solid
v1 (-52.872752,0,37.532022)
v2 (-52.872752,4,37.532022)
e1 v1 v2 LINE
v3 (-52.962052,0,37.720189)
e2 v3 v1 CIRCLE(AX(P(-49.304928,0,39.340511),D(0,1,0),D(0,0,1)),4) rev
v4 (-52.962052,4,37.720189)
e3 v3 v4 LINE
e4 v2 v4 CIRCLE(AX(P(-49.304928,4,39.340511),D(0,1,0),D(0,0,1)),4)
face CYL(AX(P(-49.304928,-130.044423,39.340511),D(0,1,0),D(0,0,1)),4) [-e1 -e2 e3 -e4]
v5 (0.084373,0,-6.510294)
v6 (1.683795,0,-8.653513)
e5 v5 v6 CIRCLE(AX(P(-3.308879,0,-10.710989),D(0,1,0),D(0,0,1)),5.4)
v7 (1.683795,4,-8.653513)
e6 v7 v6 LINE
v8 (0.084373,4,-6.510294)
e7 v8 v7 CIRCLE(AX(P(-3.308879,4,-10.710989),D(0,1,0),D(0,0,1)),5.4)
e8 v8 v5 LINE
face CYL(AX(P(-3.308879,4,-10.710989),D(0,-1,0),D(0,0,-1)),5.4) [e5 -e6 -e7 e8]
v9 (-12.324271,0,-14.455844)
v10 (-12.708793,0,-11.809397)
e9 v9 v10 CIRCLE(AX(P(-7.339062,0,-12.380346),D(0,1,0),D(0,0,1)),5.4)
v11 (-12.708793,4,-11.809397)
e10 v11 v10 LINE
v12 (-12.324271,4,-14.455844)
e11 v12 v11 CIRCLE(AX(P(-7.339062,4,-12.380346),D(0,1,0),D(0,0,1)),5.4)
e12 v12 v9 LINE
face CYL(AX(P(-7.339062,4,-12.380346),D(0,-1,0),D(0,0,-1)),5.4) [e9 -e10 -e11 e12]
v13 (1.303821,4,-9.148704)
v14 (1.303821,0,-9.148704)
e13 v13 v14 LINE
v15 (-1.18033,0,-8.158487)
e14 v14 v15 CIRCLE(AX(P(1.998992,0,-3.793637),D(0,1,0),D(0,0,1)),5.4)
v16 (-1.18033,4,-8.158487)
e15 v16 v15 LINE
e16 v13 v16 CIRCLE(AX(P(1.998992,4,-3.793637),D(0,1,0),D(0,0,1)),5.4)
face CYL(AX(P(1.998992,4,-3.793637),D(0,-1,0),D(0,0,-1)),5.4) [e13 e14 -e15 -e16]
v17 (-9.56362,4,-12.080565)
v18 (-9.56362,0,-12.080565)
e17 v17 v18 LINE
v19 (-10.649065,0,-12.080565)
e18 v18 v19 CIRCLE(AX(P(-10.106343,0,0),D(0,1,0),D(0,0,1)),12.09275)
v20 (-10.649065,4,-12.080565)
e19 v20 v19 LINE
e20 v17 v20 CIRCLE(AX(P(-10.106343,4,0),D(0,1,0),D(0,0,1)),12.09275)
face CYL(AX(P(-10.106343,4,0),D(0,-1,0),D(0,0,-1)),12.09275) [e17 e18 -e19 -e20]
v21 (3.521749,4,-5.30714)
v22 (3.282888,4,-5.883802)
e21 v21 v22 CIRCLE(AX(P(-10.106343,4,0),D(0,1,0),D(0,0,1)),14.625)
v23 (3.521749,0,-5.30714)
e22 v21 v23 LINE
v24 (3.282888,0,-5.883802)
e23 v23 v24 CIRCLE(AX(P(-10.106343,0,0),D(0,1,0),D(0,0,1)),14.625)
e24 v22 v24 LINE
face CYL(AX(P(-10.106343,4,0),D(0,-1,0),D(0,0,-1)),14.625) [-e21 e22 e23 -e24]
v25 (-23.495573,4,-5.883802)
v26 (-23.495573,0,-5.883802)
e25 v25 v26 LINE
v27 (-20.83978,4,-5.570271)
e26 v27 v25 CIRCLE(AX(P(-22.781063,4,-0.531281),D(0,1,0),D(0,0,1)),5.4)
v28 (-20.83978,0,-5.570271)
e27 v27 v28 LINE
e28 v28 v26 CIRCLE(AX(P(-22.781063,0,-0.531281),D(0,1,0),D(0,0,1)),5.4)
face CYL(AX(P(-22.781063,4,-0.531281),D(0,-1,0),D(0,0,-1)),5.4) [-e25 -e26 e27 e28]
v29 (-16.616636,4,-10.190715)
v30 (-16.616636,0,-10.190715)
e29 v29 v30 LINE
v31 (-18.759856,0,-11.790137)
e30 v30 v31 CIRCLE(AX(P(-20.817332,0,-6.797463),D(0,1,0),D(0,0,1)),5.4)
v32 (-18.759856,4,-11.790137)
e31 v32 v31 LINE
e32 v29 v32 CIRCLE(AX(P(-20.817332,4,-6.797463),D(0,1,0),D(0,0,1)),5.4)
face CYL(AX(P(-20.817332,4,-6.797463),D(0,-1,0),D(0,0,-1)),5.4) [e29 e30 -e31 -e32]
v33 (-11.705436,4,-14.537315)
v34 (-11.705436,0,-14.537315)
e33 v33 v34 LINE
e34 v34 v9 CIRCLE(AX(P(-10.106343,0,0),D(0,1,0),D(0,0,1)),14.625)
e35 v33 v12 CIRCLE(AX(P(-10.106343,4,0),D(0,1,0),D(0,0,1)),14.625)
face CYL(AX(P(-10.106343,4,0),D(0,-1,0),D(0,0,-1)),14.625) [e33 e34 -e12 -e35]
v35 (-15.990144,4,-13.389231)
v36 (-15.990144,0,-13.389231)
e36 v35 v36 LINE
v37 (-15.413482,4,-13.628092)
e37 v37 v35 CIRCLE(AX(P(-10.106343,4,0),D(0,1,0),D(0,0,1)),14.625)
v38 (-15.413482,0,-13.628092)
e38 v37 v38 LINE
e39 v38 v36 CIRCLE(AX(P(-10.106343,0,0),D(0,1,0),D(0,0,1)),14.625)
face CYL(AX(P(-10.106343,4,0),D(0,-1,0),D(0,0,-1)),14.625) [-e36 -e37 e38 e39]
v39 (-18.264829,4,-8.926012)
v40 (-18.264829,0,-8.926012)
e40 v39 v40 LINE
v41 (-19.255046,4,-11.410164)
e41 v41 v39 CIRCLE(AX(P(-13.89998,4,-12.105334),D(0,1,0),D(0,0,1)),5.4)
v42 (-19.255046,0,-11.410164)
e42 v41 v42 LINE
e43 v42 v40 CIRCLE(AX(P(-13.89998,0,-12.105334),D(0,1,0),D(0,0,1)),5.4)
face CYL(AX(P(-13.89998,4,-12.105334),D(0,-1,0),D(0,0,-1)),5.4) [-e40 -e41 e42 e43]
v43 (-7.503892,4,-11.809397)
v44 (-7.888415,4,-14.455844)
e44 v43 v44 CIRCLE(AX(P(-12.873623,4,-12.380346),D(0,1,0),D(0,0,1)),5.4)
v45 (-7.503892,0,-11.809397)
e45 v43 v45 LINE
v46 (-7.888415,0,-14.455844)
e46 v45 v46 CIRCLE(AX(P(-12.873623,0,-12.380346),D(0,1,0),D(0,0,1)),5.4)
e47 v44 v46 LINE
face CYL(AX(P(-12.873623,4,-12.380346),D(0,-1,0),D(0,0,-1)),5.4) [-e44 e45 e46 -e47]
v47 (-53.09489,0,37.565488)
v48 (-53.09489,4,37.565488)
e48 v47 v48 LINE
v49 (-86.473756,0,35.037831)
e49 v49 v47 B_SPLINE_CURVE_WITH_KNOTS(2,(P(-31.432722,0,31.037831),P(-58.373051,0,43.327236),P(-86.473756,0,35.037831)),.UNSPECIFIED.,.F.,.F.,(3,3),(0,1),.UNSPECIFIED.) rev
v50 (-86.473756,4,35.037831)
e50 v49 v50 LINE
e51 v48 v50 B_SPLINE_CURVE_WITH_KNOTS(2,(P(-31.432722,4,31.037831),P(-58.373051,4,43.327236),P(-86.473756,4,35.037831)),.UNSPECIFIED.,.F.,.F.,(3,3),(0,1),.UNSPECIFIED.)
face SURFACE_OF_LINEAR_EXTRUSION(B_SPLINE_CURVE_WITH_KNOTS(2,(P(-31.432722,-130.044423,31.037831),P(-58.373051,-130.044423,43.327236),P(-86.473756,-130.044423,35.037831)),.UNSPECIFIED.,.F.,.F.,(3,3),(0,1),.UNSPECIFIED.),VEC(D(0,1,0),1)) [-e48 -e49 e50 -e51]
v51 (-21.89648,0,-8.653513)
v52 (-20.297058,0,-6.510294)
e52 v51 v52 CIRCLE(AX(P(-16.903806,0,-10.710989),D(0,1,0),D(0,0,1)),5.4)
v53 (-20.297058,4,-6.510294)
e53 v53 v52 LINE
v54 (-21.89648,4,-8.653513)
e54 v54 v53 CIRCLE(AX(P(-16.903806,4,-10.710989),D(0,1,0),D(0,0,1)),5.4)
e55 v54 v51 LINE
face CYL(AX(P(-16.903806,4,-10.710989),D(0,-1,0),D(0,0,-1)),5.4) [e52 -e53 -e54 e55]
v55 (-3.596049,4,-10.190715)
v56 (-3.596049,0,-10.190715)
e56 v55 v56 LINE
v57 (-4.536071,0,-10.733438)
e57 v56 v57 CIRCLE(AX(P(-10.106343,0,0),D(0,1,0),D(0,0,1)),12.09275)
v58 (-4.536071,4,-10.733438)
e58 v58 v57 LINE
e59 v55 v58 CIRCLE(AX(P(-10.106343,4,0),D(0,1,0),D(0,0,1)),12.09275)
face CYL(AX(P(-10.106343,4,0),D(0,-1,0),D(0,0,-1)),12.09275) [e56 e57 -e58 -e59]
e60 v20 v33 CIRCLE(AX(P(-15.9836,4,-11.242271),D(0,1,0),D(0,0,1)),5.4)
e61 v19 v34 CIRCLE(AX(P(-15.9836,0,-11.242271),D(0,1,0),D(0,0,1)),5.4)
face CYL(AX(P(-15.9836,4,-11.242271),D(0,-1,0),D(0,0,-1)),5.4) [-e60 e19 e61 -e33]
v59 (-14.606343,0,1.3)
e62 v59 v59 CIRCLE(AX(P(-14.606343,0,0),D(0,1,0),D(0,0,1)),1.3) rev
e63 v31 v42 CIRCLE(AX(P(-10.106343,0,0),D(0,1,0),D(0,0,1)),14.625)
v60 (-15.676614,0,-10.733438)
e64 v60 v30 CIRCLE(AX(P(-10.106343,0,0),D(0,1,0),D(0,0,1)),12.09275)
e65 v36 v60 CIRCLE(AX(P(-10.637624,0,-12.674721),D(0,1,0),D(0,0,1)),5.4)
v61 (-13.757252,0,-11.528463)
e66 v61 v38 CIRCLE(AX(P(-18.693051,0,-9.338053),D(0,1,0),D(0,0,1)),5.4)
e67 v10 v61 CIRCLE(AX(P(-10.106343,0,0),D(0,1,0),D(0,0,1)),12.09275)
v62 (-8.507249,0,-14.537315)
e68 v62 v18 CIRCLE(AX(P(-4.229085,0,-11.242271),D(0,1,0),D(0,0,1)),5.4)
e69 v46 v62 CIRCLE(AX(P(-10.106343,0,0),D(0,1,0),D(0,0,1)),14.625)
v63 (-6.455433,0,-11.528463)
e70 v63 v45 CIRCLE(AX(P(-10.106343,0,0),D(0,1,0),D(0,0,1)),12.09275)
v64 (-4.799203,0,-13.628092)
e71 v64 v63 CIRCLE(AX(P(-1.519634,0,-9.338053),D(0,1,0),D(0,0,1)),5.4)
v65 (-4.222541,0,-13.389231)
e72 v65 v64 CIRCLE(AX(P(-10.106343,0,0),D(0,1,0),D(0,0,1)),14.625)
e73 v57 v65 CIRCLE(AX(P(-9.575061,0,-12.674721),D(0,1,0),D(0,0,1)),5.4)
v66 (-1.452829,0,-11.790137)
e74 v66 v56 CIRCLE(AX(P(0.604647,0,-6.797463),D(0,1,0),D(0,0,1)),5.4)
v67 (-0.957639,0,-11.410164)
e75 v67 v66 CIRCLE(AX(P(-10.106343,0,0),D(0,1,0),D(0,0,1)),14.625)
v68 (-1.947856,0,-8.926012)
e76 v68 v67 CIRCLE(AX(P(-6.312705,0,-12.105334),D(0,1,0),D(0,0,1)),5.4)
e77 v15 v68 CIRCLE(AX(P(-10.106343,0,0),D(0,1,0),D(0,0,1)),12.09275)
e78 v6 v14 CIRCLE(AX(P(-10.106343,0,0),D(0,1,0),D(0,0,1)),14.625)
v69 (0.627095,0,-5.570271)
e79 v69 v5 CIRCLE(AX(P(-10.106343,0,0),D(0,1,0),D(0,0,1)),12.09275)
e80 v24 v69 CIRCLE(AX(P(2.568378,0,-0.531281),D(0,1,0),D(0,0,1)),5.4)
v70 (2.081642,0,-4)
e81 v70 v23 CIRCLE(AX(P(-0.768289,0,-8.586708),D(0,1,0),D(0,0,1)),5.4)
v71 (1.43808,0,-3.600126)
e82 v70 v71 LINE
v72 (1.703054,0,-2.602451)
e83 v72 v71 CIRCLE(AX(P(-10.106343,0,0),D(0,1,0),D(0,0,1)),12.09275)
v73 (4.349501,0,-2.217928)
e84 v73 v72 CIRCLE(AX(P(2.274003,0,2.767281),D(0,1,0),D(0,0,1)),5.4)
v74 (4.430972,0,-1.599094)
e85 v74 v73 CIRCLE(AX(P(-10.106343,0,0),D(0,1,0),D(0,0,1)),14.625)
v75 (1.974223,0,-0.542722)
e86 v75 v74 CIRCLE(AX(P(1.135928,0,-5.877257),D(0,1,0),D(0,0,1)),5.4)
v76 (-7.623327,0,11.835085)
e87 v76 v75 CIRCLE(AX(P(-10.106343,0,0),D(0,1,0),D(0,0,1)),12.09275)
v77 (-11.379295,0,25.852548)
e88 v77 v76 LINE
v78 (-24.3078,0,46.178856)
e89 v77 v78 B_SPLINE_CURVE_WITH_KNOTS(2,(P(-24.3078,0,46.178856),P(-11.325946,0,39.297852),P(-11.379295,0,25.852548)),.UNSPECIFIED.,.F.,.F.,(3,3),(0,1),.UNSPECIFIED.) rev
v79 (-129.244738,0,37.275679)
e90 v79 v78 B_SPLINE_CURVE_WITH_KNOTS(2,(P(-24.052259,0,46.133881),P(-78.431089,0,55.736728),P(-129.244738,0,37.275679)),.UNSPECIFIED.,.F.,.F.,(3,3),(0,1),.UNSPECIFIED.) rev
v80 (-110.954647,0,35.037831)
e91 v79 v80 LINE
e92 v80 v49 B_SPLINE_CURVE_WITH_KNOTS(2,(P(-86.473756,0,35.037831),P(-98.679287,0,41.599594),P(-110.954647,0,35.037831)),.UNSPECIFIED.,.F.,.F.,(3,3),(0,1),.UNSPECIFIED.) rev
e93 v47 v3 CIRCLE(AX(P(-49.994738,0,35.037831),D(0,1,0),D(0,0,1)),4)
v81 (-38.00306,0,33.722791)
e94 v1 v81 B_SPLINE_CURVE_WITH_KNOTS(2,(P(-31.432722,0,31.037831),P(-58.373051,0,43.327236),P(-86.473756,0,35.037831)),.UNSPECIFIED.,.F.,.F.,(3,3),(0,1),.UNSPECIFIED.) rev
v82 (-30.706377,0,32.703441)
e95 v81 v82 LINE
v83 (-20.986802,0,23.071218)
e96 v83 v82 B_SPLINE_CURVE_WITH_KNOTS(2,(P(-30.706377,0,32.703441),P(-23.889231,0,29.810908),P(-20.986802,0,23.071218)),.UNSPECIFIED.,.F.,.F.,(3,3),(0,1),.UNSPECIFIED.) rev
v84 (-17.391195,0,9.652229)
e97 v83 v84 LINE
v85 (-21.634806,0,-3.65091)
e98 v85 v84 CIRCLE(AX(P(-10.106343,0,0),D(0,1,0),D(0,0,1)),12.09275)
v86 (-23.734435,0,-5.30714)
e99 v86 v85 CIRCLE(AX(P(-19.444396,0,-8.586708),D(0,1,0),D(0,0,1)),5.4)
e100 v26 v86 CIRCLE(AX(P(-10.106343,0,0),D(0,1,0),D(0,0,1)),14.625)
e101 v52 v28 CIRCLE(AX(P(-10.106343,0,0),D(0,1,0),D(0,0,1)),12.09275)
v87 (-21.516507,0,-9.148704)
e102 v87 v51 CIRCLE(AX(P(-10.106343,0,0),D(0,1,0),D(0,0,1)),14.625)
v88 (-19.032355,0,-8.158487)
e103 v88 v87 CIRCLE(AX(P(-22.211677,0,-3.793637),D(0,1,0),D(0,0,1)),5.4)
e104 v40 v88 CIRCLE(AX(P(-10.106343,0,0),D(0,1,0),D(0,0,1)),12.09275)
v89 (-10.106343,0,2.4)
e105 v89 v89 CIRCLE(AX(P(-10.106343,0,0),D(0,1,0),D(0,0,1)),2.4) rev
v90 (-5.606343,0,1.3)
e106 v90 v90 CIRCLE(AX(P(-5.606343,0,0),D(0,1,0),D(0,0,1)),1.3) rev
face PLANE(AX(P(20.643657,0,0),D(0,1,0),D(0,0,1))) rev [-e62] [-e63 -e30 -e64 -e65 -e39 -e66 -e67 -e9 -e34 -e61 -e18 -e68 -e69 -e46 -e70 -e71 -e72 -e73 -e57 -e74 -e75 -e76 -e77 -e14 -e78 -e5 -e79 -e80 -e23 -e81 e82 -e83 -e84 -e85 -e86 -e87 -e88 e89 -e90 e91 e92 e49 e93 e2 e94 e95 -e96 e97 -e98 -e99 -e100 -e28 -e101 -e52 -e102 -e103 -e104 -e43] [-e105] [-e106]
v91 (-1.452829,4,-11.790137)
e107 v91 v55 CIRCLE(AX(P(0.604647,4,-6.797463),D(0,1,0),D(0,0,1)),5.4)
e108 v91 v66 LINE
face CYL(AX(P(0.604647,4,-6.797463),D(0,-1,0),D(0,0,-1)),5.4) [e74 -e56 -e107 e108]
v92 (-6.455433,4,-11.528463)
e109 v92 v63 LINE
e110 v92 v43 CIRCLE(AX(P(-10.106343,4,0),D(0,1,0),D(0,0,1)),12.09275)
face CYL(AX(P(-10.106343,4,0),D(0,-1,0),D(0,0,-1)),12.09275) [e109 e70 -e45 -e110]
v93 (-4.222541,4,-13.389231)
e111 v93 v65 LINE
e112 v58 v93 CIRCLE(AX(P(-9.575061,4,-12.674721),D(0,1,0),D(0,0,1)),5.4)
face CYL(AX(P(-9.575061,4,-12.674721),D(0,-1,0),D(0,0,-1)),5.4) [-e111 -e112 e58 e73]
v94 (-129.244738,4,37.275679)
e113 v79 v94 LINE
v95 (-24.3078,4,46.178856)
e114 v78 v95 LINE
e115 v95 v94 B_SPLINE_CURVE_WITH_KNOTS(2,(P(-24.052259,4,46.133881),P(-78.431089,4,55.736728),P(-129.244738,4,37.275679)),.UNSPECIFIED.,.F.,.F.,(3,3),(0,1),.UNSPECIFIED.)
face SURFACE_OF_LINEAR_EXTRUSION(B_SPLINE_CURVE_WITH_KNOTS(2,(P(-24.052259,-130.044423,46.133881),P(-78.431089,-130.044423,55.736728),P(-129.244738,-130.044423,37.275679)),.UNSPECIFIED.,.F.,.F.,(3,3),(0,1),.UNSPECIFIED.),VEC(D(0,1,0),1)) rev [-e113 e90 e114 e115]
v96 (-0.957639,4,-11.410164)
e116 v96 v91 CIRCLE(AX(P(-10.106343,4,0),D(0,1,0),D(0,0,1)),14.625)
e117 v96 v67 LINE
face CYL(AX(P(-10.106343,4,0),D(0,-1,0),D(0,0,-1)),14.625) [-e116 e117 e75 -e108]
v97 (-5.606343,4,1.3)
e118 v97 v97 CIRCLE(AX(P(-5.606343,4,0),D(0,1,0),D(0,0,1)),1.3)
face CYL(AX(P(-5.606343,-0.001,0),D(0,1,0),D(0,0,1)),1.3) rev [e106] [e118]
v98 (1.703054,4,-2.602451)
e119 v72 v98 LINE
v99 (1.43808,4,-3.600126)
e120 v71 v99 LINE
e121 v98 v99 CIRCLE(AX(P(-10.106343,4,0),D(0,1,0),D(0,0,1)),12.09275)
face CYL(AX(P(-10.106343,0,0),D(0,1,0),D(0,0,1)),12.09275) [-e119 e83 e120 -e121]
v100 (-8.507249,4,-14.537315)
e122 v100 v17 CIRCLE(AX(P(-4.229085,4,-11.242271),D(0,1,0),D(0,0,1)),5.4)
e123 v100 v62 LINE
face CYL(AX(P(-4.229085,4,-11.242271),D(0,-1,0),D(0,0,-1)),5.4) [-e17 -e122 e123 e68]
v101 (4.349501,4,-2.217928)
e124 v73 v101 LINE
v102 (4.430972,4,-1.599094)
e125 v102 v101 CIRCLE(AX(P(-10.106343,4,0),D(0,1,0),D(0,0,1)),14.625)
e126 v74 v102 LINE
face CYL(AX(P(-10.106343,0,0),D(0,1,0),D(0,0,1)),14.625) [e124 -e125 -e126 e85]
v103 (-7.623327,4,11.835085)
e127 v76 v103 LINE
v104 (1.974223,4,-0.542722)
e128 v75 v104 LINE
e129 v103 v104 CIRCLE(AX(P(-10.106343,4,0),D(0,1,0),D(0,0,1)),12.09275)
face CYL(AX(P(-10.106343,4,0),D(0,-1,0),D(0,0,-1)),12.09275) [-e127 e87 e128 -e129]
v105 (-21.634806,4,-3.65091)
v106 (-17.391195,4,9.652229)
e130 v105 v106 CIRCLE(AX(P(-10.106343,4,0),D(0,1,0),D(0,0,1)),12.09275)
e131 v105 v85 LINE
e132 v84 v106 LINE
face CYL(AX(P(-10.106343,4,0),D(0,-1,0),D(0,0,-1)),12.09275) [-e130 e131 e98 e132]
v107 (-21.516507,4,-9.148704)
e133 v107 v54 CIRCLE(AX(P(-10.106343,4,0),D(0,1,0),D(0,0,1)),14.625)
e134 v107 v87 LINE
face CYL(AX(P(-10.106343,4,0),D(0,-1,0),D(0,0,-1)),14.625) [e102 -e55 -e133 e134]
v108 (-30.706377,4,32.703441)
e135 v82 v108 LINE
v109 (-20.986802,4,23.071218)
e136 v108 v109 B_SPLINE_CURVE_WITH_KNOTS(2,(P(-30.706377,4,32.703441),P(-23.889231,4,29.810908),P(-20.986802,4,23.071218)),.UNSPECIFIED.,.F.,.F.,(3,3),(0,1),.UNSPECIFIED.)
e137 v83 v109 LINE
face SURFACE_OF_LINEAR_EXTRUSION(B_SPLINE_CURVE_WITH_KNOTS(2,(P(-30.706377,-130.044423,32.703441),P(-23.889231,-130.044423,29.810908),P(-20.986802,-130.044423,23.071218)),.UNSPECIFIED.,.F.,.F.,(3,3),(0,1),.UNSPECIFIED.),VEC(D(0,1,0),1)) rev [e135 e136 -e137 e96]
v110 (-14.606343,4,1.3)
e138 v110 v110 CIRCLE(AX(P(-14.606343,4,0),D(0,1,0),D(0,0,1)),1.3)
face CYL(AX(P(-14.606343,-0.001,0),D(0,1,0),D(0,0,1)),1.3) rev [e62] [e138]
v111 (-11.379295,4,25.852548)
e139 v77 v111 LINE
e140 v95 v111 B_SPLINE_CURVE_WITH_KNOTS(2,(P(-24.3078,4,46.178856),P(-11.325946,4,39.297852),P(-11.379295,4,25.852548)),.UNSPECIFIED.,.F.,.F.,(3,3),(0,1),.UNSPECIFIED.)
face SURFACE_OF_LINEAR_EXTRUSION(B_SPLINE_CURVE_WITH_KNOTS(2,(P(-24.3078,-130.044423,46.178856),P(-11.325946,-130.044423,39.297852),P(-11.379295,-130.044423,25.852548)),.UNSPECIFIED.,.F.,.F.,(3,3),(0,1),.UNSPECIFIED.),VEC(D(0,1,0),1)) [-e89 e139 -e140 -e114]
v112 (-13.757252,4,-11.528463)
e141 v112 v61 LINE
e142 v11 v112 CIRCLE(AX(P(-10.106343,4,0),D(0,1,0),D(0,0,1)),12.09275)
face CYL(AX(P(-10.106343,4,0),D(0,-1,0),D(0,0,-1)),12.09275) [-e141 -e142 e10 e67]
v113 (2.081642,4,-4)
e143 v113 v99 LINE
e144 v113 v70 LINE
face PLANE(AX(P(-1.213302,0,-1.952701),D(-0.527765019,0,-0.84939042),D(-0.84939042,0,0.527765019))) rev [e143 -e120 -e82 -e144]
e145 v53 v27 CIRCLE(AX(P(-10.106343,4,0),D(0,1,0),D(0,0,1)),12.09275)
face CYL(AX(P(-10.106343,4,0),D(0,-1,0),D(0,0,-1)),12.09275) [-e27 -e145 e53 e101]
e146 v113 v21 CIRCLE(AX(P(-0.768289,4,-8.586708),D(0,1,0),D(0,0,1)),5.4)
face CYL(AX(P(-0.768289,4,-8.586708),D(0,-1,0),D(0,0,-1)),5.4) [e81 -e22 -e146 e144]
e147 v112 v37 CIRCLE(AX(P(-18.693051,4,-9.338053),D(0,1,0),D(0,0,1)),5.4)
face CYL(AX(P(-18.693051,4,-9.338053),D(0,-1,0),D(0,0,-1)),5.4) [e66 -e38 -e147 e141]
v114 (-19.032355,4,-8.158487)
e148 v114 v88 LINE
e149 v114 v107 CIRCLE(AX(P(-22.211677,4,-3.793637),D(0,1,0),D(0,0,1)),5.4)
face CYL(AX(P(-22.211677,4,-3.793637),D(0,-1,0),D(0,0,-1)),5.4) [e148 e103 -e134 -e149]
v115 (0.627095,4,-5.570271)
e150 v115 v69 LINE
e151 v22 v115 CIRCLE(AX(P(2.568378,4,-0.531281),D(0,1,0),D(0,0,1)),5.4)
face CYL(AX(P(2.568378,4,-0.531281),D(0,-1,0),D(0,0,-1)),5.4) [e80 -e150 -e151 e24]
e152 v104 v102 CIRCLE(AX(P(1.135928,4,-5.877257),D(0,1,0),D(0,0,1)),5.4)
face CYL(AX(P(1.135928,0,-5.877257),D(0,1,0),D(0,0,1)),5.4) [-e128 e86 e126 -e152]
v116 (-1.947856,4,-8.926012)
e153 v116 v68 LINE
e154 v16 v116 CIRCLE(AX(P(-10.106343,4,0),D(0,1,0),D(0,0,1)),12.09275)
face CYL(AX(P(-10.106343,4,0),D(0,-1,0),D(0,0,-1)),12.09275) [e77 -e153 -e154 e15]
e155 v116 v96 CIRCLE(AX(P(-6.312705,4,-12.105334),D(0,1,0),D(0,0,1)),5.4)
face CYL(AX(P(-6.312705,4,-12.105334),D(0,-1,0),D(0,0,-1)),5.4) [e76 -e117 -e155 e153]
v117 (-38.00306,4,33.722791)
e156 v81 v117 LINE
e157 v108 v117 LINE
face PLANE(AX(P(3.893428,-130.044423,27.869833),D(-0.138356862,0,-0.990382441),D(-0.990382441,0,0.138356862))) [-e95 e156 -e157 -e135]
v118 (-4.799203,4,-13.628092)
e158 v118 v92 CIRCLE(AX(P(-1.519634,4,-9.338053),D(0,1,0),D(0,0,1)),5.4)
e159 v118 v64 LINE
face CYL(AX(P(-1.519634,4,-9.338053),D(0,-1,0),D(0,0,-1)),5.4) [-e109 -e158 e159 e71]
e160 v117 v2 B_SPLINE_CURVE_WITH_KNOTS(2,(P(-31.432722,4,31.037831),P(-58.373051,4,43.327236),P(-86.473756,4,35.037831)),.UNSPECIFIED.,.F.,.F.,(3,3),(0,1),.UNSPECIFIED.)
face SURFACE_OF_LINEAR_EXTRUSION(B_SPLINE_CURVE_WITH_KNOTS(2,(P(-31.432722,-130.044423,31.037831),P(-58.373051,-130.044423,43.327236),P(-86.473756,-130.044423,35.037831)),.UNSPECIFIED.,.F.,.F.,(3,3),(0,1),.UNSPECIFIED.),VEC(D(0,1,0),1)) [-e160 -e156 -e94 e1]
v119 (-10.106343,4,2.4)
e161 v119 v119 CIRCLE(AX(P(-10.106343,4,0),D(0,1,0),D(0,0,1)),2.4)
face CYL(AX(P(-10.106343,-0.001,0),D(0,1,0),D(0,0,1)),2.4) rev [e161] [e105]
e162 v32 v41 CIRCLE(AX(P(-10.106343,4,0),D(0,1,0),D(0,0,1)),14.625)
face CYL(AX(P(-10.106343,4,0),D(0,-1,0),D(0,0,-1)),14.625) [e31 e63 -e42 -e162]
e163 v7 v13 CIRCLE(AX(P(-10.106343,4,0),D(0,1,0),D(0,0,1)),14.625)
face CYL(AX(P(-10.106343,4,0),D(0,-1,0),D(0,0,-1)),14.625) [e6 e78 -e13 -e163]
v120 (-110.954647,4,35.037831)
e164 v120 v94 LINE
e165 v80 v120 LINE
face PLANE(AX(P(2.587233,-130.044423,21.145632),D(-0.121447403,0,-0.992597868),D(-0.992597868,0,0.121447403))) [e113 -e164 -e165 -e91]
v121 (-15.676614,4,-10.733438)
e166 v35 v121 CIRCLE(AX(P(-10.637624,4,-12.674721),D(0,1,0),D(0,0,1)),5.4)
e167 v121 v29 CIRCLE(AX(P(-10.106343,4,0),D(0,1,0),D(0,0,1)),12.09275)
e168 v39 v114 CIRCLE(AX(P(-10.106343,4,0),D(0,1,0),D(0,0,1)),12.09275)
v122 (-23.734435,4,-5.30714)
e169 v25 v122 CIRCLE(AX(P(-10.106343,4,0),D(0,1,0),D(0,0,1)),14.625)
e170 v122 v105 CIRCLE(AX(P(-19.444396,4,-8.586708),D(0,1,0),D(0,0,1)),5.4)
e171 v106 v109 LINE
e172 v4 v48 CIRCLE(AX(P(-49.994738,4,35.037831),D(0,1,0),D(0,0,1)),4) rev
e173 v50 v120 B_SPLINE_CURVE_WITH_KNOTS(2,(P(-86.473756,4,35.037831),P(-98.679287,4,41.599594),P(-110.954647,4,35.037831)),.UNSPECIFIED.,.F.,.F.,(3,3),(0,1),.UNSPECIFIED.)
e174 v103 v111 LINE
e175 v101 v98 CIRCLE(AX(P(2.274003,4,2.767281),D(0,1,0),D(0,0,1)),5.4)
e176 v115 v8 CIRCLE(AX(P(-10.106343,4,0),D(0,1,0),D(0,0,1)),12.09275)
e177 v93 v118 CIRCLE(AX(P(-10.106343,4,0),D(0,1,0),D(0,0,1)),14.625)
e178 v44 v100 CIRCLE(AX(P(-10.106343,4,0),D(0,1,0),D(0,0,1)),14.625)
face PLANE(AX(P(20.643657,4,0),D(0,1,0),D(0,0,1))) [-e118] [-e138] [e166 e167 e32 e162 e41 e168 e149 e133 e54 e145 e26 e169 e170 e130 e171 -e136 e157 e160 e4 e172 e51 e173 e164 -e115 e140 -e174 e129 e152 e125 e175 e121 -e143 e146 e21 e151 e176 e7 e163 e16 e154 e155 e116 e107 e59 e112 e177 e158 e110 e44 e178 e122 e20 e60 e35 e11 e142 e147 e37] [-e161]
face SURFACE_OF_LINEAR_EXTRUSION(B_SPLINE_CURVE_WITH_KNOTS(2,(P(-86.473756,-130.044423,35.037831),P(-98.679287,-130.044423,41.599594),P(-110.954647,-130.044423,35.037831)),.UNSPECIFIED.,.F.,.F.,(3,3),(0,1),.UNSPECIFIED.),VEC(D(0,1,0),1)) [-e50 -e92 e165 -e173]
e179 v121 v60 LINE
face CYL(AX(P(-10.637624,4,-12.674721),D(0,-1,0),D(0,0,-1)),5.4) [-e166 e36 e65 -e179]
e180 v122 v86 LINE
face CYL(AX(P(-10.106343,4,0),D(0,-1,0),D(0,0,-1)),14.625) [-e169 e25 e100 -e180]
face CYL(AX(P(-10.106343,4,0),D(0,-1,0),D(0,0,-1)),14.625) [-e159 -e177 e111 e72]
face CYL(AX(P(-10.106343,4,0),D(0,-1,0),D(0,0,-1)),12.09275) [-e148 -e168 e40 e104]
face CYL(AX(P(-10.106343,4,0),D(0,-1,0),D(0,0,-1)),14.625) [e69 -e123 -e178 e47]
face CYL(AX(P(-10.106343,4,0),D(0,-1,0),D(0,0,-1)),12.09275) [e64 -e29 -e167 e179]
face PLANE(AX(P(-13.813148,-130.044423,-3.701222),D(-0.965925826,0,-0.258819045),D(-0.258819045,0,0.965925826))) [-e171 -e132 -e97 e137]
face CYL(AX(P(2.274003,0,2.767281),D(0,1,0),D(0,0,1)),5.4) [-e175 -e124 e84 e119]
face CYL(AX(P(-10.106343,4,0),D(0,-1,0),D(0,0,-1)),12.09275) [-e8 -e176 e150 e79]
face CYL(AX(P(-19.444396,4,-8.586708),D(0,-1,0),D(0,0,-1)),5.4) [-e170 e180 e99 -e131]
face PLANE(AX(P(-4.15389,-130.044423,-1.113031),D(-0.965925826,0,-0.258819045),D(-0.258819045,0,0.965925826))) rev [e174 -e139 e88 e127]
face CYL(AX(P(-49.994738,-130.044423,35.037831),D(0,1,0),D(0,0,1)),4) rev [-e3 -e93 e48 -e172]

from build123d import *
from build123d.topology import SkipClean

# Parameters (mm, degrees)
SKETCH1_R           = 1.5
BOSS_EXTRUDE1_DEPTH = 4
SKETCH3_R           = 1.75
BOSS_EXTRUDE2_DEPTH = 4
CUT_EXTRUDE1_START  = -4
CUT_EXTRUDE1_DEPTH  = 4
CUT_EXTRUDE2_REACH  = 49.073
SKETCH5_R           = 1.3
SKETCH5_R_2         = 2.4
BOSS_EXTRUDE3_START = -4
BOSS_EXTRUDE3_DEPTH = 4
CUT_EXTRUDE3_START  = -10
SKETCH6_3_R         = 1.75
CUT_EXTRUDE3_DEPTH  = 10


with BuildPart() as part:
    # Sketch1 → Boss-Extrude1 (new body)
    with BuildSketch(Plane(origin=(0, 0, 0), x_dir=(1, 0, 0), z_dir=(0, 1, 0))):
        with BuildLine():
            Line((20.643657446, 4), (2.081641936, 4))
            ThreePointArc((2.081641936, 4), (2.861028333, 4.588201733), (3.521749436, 5.30713988))
            ThreePointArc((3.521749436, 5.30713988), (3.405395609, 5.596745198), (3.282888305, 5.883801663))
            ThreePointArc((3.282888305, 5.883801663), (1.93527598, 5.894040025), (0.627094961, 5.57027124))
            ThreePointArc((0.627094961, 5.57027124), (0.366286148, 6.046375), (0.084372603, 6.510293938))
            ThreePointArc((0.084372603, 6.510293938), (1.018855105, 7.48132754), (1.683794586, 8.65351323))
            ThreePointArc((1.683794586, 8.65351323), (1.496450048, 8.903135899), (1.303821399, 9.148703928))
            ThreePointArc((1.303821399, 9.148703928), (-0.000522033, 8.809805691), (-1.180330337, 8.158486898))
            ThreePointArc((-1.180330337, 8.158486898), (-1.555477026, 8.550865528), (-1.947855656, 8.926012217))
            ThreePointArc((-1.947855656, 8.926012217), (-1.296536862, 10.105820521), (-0.957638625, 11.410163953))
            ThreePointArc((-0.957638625, 11.410163953), (-1.203206655, 11.602792602), (-1.452829324, 11.79013714))
            ThreePointArc((-1.452829324, 11.79013714), (-2.625015014, 11.125197659), (-3.596048616, 10.190715157))
            ThreePointArc((-3.596048616, 10.190715157), (-4.059967554, 10.472628702), (-4.536071314, 10.733437515))
            ThreePointArc((-4.536071314, 10.733437515), (-4.212302529, 12.041618533), (-4.222540891, 13.389230859))
            ThreePointArc((-4.222540891, 13.389230859), (-4.509597355, 13.511738163), (-4.799202674, 13.62809199))
            ThreePointArc((-4.799202674, 13.62809199), (-5.759348103, 12.682425791), (-6.455432668, 11.528463019))
            ThreePointArc((-6.455432668, 11.528463019), (-6.976508546, 11.680699536), (-7.503891752, 11.809396783))
            ThreePointArc((-7.503891752, 11.809396783), (-7.529737283, 13.156800143), (-7.888414517, 14.455843809))
            ThreePointArc((-7.888414517, 14.455843809), (-8.197396993, 14.499881098), (-8.507248835, 14.537314892))
            ThreePointArc((-8.507248835, 14.537314892), (-9.18992168, 13.375367565), (-9.563620196, 12.080565177))
            ThreePointArc((-9.563620196, 12.080565177), (-10.106342554, 12.09275), (-10.649064912, 12.080565177))
            ThreePointArc((-10.649064912, 12.080565177), (-11.022763428, 13.375367565), (-11.705436272, 14.537314892))
            ThreePointArc((-11.705436272, 14.537314892), (-12.015288115, 14.499881098), (-12.324270591, 14.455843809))
            ThreePointArc((-12.324270591, 14.455843809), (-12.682947825, 13.156800143), (-12.708793355, 11.809396783))
            ThreePointArc((-12.708793355, 11.809396783), (-13.236176561, 11.680699536), (-13.757252439, 11.528463019))
            ThreePointArc((-13.757252439, 11.528463019), (-14.453337005, 12.682425791), (-15.413482434, 13.62809199))
            ThreePointArc((-15.413482434, 13.62809199), (-15.703087752, 13.511738163), (-15.990144217, 13.389230859))
            ThreePointArc((-15.990144217, 13.389230859), (-16.000382579, 12.041618533), (-15.676613793, 10.733437515))
            ThreePointArc((-15.676613793, 10.733437515), (-16.152717554, 10.472628702), (-16.616636492, 10.190715157))
            ThreePointArc((-16.616636492, 10.190715157), (-17.587670094, 11.125197659), (-18.759855783, 11.79013714))
            ThreePointArc((-18.759855783, 11.79013714), (-19.009478453, 11.602792602), (-19.255046482, 11.410163953))
            ThreePointArc((-19.255046482, 11.410163953), (-18.916148245, 10.105820521), (-18.264829452, 8.926012217))
            ThreePointArc((-18.264829452, 8.926012217), (-18.657208082, 8.550865528), (-19.032354771, 8.158486898))
            ThreePointArc((-19.032354771, 8.158486898), (-20.212163074, 8.809805691), (-21.516506507, 9.148703928))
            ThreePointArc((-21.516506507, 9.148703928), (-21.709135156, 8.903135899), (-21.896479694, 8.65351323))
            ThreePointArc((-21.896479694, 8.65351323), (-21.231540213, 7.48132754), (-20.297057711, 6.510293938))
            ThreePointArc((-20.297057711, 6.510293938), (-20.578971255, 6.046375), (-20.839780068, 5.57027124))
            ThreePointArc((-20.839780068, 5.57027124), (-22.147961087, 5.894040025), (-23.495573413, 5.883801663))
            ThreePointArc((-23.495573413, 5.883801663), (-23.618080717, 5.596745198), (-23.734434544, 5.30713988))
            ThreePointArc((-23.734434544, 5.30713988), (-22.788768345, 4.346994451), (-21.634805572, 3.650909885))
            ThreePointArc((-21.634805572, 3.650909885), (-21.78704209, 3.129834008), (-21.915739337, 2.602450802))
            ThreePointArc((-21.915739337, 2.602450802), (-23.263142697, 2.576605271), (-24.562186363, 2.217928037))
            ThreePointArc((-24.562186363, 2.217928037), (-24.606223651, 1.908945561), (-24.643657446, 1.599093719))
            ThreePointArc((-24.643657446, 1.599093719), (-23.481710119, 0.916420874), (-22.186907731, 0.542722358))
            ThreePointArc((-22.186907731, 0.542722358), (-22.199092554, 0), (-22.186907731, -0.542722358))
            ThreePointArc((-22.186907731, -0.542722358), (-23.481710119, -0.916420874), (-24.643657446, -1.599093719))
            ThreePointArc((-24.643657446, -1.599093719), (-24.606223651, -1.908945561), (-24.562186363, -2.217928037))
            ThreePointArc((-24.562186363, -2.217928037), (-23.263142697, -2.576605271), (-21.915739337, -2.602450802))
            ThreePointArc((-21.915739337, -2.602450802), (-21.78704209, -3.129834008), (-21.634805572, -3.650909885))
            ThreePointArc((-21.634805572, -3.650909885), (-22.788768345, -4.346994451), (-23.734434544, -5.30713988))
            ThreePointArc((-23.734434544, -5.30713988), (-23.618080717, -5.596745198), (-23.495573413, -5.883801663))
            ThreePointArc((-23.495573413, -5.883801663), (-22.147961087, -5.894040025), (-20.839780068, -5.57027124))
            ThreePointArc((-20.839780068, -5.57027124), (-20.578971255, -6.046375), (-20.297057711, -6.510293938))
            ThreePointArc((-20.297057711, -6.510293938), (-21.231540213, -7.48132754), (-21.896479694, -8.65351323))
            ThreePointArc((-21.896479694, -8.65351323), (-21.709135156, -8.903135899), (-21.516506507, -9.148703928))
            ThreePointArc((-21.516506507, -9.148703928), (-20.212163074, -8.809805691), (-19.032354771, -8.158486898))
            ThreePointArc((-19.032354771, -8.158486898), (-18.657208082, -8.550865528), (-18.264829452, -8.926012217))
            ThreePointArc((-18.264829452, -8.926012217), (-18.916148245, -10.105820521), (-19.255046482, -11.410163953))
            ThreePointArc((-19.255046482, -11.410163953), (-19.009478453, -11.602792602), (-18.759855783, -11.79013714))
            ThreePointArc((-18.759855783, -11.79013714), (-17.587670094, -11.125197659), (-16.616636492, -10.190715157))
            ThreePointArc((-16.616636492, -10.190715157), (-16.152717554, -10.472628702), (-15.676613793, -10.733437515))
            ThreePointArc((-15.676613793, -10.733437515), (-16.000382579, -12.041618533), (-15.990144217, -13.389230859))
            ThreePointArc((-15.990144217, -13.389230859), (-15.703087752, -13.511738163), (-15.413482434, -13.62809199))
            ThreePointArc((-15.413482434, -13.62809199), (-14.453337005, -12.682425791), (-13.757252439, -11.528463019))
            ThreePointArc((-13.757252439, -11.528463019), (-13.236176561, -11.680699536), (-12.708793355, -11.809396783))
            ThreePointArc((-12.708793355, -11.809396783), (-12.682947825, -13.156800143), (-12.324270591, -14.455843809))
            ThreePointArc((-12.324270591, -14.455843809), (-12.015288115, -14.499881098), (-11.705436272, -14.537314892))
            ThreePointArc((-11.705436272, -14.537314892), (-11.022763428, -13.375367565), (-10.649064912, -12.080565177))
            ThreePointArc((-10.649064912, -12.080565177), (-10.106342554, -12.09275), (-9.563620196, -12.080565177))
            ThreePointArc((-9.563620196, -12.080565177), (-9.18992168, -13.375367565), (-8.507248835, -14.537314892))
            ThreePointArc((-8.507248835, -14.537314892), (-8.197396993, -14.499881098), (-7.888414517, -14.455843809))
            ThreePointArc((-7.888414517, -14.455843809), (-7.529737283, -13.156800143), (-7.503891752, -11.809396783))
            ThreePointArc((-7.503891752, -11.809396783), (-6.976508546, -11.680699536), (-6.455432668, -11.528463019))
            ThreePointArc((-6.455432668, -11.528463019), (-5.759348103, -12.682425791), (-4.799202674, -13.62809199))
            ThreePointArc((-4.799202674, -13.62809199), (-4.509597355, -13.511738163), (-4.222540891, -13.389230859))
            ThreePointArc((-4.222540891, -13.389230859), (-4.212302529, -12.041618533), (-4.536071314, -10.733437515))
            ThreePointArc((-4.536071314, -10.733437515), (-4.059967554, -10.472628702), (-3.596048616, -10.190715157))
            ThreePointArc((-3.596048616, -10.190715157), (-2.625015014, -11.125197659), (-1.452829324, -11.79013714))
            ThreePointArc((-1.452829324, -11.79013714), (-1.203206655, -11.602792602), (-0.957638625, -11.410163953))
            ThreePointArc((-0.957638625, -11.410163953), (-1.296536862, -10.105820521), (-1.947855656, -8.926012217))
            ThreePointArc((-1.947855656, -8.926012217), (-1.555477026, -8.550865528), (-1.180330337, -8.158486898))
            ThreePointArc((-1.180330337, -8.158486898), (-0.000522033, -8.809805691), (1.303821399, -9.148703928))
            ThreePointArc((1.303821399, -9.148703928), (1.496450048, -8.903135899), (1.683794586, -8.65351323))
            ThreePointArc((1.683794586, -8.65351323), (1.018855105, -7.48132754), (0.084372603, -6.510293938))
            ThreePointArc((0.084372603, -6.510293938), (0.366286148, -6.046375), (0.627094961, -5.57027124))
            ThreePointArc((0.627094961, -5.57027124), (1.93527598, -5.894040025), (3.282888305, -5.883801663))
            ThreePointArc((3.282888305, -5.883801663), (3.405395609, -5.596745198), (3.521749436, -5.30713988))
            ThreePointArc((3.521749436, -5.30713988), (2.861028333, -4.588201733), (2.081641936, -4))
            Line((2.081641936, -4), (20.643657446, -4))
            ThreePointArc((20.643657446, -4), (24.643657446, 0), (20.643657446, 4))
        make_face()
        with Locations(Location((-10.106342554, 0, 0), (0, 0, 270))):
            Circle(SKETCH1_R, mode=Mode.SUBTRACT)
        with Locations(Location((20.643657446, 0, 0), (0, 0, 270))):
            Circle(SKETCH1_R, mode=Mode.SUBTRACT)
    extrude(amount=BOSS_EXTRUDE1_DEPTH)

    # Sketch3 → Boss-Extrude2 (add)
    with BuildSketch(Plane(origin=(0, 4, 0), x_dir=(1, 0, 0), z_dir=(0, 1, 0))):
        with BuildLine():
            ThreePointArc((-9.584237785, -3.965779445), (-14.072121999, -0.522104769), (-10.628447323, 3.965779445))
            Line((-10.628447323, 3.965779445), (-41.11537681, -0.047900965))
            ThreePointArc((-41.11537681, -0.047900965), (-44.559051487, -4.53578518), (-40.071167272, -7.979459856))
            Line((-40.071167272, -7.979459856), (-9.584237785, -3.965779445))
        make_face()
        with Locations(Location((-40.593272041, -4.013680411, 0), (0, 0, 270))):
            Circle(SKETCH3_R, mode=Mode.SUBTRACT)
    extrude(amount=-BOSS_EXTRUDE2_DEPTH)

    # Sketch4 → Cut-Extrude1 (cut)
    with SkipClean():  # the faces are left unmerged after this step: merging them gives an invalid solid
        with BuildSketch(Plane(origin=(0, 4, 0), x_dir=(1, 0, 0), z_dir=(0, 1, 0)).offset(CUT_EXTRUDE1_START)):
            with BuildLine():
                ThreePointArc((20.643657446, -4), (24.643657446, 0), (20.643657446, 4))
                Line((20.643657446, 4), (2.081641936, 4))
                Line((2.081641936, 4), (1.43808022, 3.600125745))
                ThreePointArc((1.43808022, 3.600125745), (1.581217534, 3.104116905), (1.70305423, 2.602450802))
                ThreePointArc((1.70305423, 2.602450802), (3.050457589, 2.576605271), (4.349501255, 2.217928037))
                ThreePointArc((4.349501255, 2.217928037), (4.393538544, 1.908945561), (4.430972339, 1.599093719))
                ThreePointArc((4.430972339, 1.599093719), (3.269025011, 0.916420874), (1.974222624, 0.542722358))
                ThreePointArc((1.974222624, 0.542722358), (1.70305423, -2.602450802), (0.627094961, -5.57027124))
                ThreePointArc((0.627094961, -5.57027124), (1.93527598, -5.894040025), (3.282888305, -5.883801663))
                ThreePointArc((3.282888305, -5.883801663), (3.405395609, -5.596745198), (3.521749436, -5.30713988))
                ThreePointArc((3.521749436, -5.30713988), (2.861028333, -4.588201733), (2.081641936, -4))
                Line((2.081641936, -4), (20.643657446, -4))
            make_face()
            with BuildLine():
                ThreePointArc((1.683794586, -8.65351323), (1.018855105, -7.48132754), (0.084372603, -6.510293938))
                ThreePointArc((0.084372603, -6.510293938), (-0.512518948, -7.361599771), (-1.180330337, -8.158486898))
                ThreePointArc((-1.180330337, -8.158486898), (-0.000522033, -8.809805691), (1.303821399, -9.148703928))
                ThreePointArc((1.303821399, -9.148703928), (1.496450048, -8.903135899), (1.683794586, -8.65351323))
            make_face()
            with BuildLine():
                ThreePointArc((-0.957638625, -11.410163953), (-1.296536862, -10.105820521), (-1.947855656, -8.926012217))
                ThreePointArc((-1.947855656, -8.926012217), (-2.744742783, -9.593823606), (-3.596048616, -10.190715157))
                ThreePointArc((-3.596048616, -10.190715157), (-2.625015014, -11.125197659), (-1.452829324, -11.79013714))
                ThreePointArc((-1.452829324, -11.79013714), (-1.203206655, -11.602792602), (-0.957638625, -11.410163953))
            make_face()
            with BuildLine():
                ThreePointArc((-4.222540891, -13.389230859), (-4.212302529, -12.041618533), (-4.536071314, -10.733437515))
                ThreePointArc((-4.536071314, -10.733437515), (-5.478647477, -11.172244217), (-6.455432668, -11.528463019))
                ThreePointArc((-6.455432668, -11.528463019), (-5.759348103, -12.682425791), (-4.799202674, -13.62809199))
                ThreePointArc((-4.799202674, -13.62809199), (-4.509597355, -13.511738163), (-4.222540891, -13.389230859))
            make_face()
            with BuildLine():
                ThreePointArc((-7.888414517, -14.455843809), (-7.529737283, -13.156800143), (-7.503891752, -11.809396783))
                ThreePointArc((-7.503891752, -11.809396783), (-8.527921943, -11.989294847), (-9.563620196, -12.080565177))
                ThreePointArc((-9.563620196, -12.080565177), (-9.18992168, -13.375367565), (-8.507248835, -14.537314892))
                ThreePointArc((-8.507248835, -14.537314892), (-8.197396993, -14.499881098), (-7.888414517, -14.455843809))
            make_face()
            with BuildLine():
                ThreePointArc((-11.705436272, -14.537314892), (-11.022763428, -13.375367565), (-10.649064912, -12.080565177))
                ThreePointArc((-10.649064912, -12.080565177), (-11.684763165, -11.989294847), (-12.708793355, -11.809396783))
                ThreePointArc((-12.708793355, -11.809396783), (-12.682947825, -13.156800143), (-12.324270591, -14.455843809))
                ThreePointArc((-12.324270591, -14.455843809), (-12.015288115, -14.499881098), (-11.705436272, -14.537314892))
            make_face()
            with BuildLine():
                ThreePointArc((-15.413482434, -13.62809199), (-14.453337005, -12.682425791), (-13.757252439, -11.528463019))
                ThreePointArc((-13.757252439, -11.528463019), (-14.734037631, -11.172244217), (-15.676613793, -10.733437515))
                ThreePointArc((-15.676613793, -10.733437515), (-16.000382579, -12.041618533), (-15.990144217, -13.389230859))
                ThreePointArc((-15.990144217, -13.389230859), (-15.703087752, -13.511738163), (-15.413482434, -13.62809199))
            make_face()
            with BuildLine():
                ThreePointArc((-18.759855783, -11.79013714), (-17.587670094, -11.125197659), (-16.616636492, -10.190715157))
                ThreePointArc((-16.616636492, -10.190715157), (-17.467942324, -9.593823606), (-18.264829452, -8.926012217))
                ThreePointArc((-18.264829452, -8.926012217), (-18.916148245, -10.105820521), (-19.255046482, -11.410163953))
                ThreePointArc((-19.255046482, -11.410163953), (-19.009478453, -11.602792602), (-18.759855783, -11.79013714))
            make_face()
            with BuildLine():
                ThreePointArc((-21.516506507, -9.148703928), (-20.212163074, -8.809805691), (-19.032354771, -8.158486898))
                ThreePointArc((-19.032354771, -8.158486898), (-19.70016616, -7.361599771), (-20.297057711, -6.510293938))
                ThreePointArc((-20.297057711, -6.510293938), (-21.231540213, -7.48132754), (-21.896479694, -8.65351323))
                ThreePointArc((-21.896479694, -8.65351323), (-21.709135156, -8.903135899), (-21.516506507, -9.148703928))
            make_face()
            with BuildLine():
                ThreePointArc((-21.942853375, 2.47620963), (-21.92946485, 2.539366405), (-21.915739337, 2.602450802))
                ThreePointArc((-21.915739337, 2.602450802), (-23.263142697, 2.576605271), (-24.562186363, 2.217928037))
                ThreePointArc((-24.562186363, 2.217928037), (-24.56889027, 2.173784387), (-24.575459377, 2.129620475))
                Line((-24.575459377, 2.129620475), (-21.942853375, 2.47620963))
            make_face()
            with BuildLine():
                ThreePointArc((-23.495573413, -5.883801663), (-22.147961087, -5.894040025), (-20.839780068, -5.57027124))
                ThreePointArc((-20.839780068, -5.57027124), (-20.869365339, -5.512888815), (-20.898643838, -5.455349261))
                Line((-20.898643838, -5.455349261), (-23.531249839, -5.801938416))
                ThreePointArc((-23.531249839, -5.801938416), (-23.513474108, -5.842897269), (-23.495573413, -5.883801663))
            make_face()
        extrude(amount=CUT_EXTRUDE1_DEPTH, mode=Mode.SUBTRACT)

    # Sketch5 → Cut-Extrude2 (cut, up to next)
    with BuildSketch(Plane(origin=(0, 4, 0), x_dir=(1, 0, 0), z_dir=(0, 1, 0)), mode=Mode.PRIVATE) as cut_extrude2_sk1:
        with Locations(Location((-14.606342554, 0, 0), (0, 0, 270))):
            Circle(SKETCH5_R)
    cut_extrude2_tool1 = extrude(cut_extrude2_sk1.sketch, amount=-CUT_EXTRUDE2_REACH, mode=Mode.PRIVATE) & part.part
    # Sketch5 → Cut-Extrude2 (cut, up to next)
    with BuildSketch(Plane(origin=(0, 4, 0), x_dir=(1, 0, 0), z_dir=(0, 1, 0)), mode=Mode.PRIVATE) as cut_extrude2_sk2:
        with Locations(Location((-5.606342554, 0, 0), (0, 0, 270))):
            Circle(SKETCH5_R)
    cut_extrude2_tool2 = extrude(cut_extrude2_sk2.sketch, amount=-CUT_EXTRUDE2_REACH, mode=Mode.PRIVATE) & part.part
    # Sketch5 → Cut-Extrude2 (cut, up to next)
    with BuildSketch(Plane(origin=(0, 4, 0), x_dir=(1, 0, 0), z_dir=(0, 1, 0)), mode=Mode.PRIVATE) as cut_extrude2_sk3:
        with Locations(Location((-10.106342554, 0, 0), (0, 0, 270))):
            Circle(SKETCH5_R_2)
    cut_extrude2_tool3 = extrude(cut_extrude2_sk3.sketch, amount=-CUT_EXTRUDE2_REACH, mode=Mode.PRIVATE) & part.part
    add(cut_extrude2_tool1.solids().sort_by_distance((-14.606343, 4, 0))[0], mode=Mode.SUBTRACT)
    add(cut_extrude2_tool2.solids().sort_by_distance((-5.606343, 4, 0))[0], mode=Mode.SUBTRACT)
    add(cut_extrude2_tool3.solids().sort_by_distance((-10.106343, 4, 0))[0], mode=Mode.SUBTRACT)

    # Sketch6 → Boss-Extrude3 (add)
    with SkipClean():  # the faces are left unmerged after this step: merging them gives an invalid solid
        with BuildSketch(Plane(origin=(0, 4, 0), x_dir=(1, 0, 0), z_dir=(0, 1, 0)).offset(BOSS_EXTRUDE3_START)):
            with BuildLine():
                ThreePointArc((-52.962051912, -37.720188973), (-53.029457116, -37.643685191), (-53.094890456, -37.565488207))
                add(Edge.make_bspline(
                    [(-53.094890456, -37.565488207), (-69.574492007, -40.022931453), (-86.473755851, -35.03783058)],
                    knots=[0.398617796, 0.398617796, 0.398617796, 1, 1, 1], degree=2))
                add(Edge.make_bspline(
                    [(-86.473755851, -35.03783058), (-98.679286779, -41.59959414), (-110.954647006, -35.03783058)],
                    knots=[0, 0, 0, 1, 1, 1], degree=2))
                Line((-110.954647006, -35.03783058), (-129.244737731, -37.275679444))
                add(Edge.make_bspline(
                    [(-24.307799862, -46.178856242), (-78.550492212, -55.693347591), (-129.244737731, -37.275679444)],
                    knots=[0.002349817, 0.002349817, 0.002349817, 1, 1, 1], degree=2))
                add(Edge.make_bspline(
                    [(-24.307799862, -46.178856242), (-11.325946224, -39.297851738), (-11.379295158, -25.85254802)],
                    knots=[0, 0, 0, 1, 1, 1], degree=2))
                Line((-11.379295158, -25.85254802), (-10.692878437, -23.290805939))
                Line((-10.692878437, -23.290805939), (-7.62332727, -11.83508503))
                ThreePointArc((-7.62332727, -11.83508503), (-7.874404331, -11.88499282), (-8.126481564, -11.929574721))
                ThreePointArc((-8.126481564, -11.929574721), (-12.992916327, -11.743180762), (-17.391194669, -9.652229391))
                Line((-17.391194669, -9.652229391), (-20.453641162, -21.0814353))
                Line((-20.453641162, -21.0814353), (-20.986801846, -23.071218061))
                add(Edge.make_bspline(
                    [(-30.706376797, -32.703441208), (-23.88923072, -29.810908187), (-20.986801846, -23.071218061)],
                    knots=[0, 0, 0, 1, 1, 1], degree=2))
                Line((-30.706376797, -32.703441208), (-31.121289752, -32.76140473))
                Line((-31.121289752, -32.76140473), (-38.003060246, -33.722791093))
                add(Edge.make_bspline(
                    [(-38.003060246, -33.722791093), (-45.394684007, -36.393930701), (-52.872751681, -37.532021826)],
                    knots=[0.121623856, 0.121623856, 0.121623856, 0.394564246, 0.394564246, 0.394564246], degree=2))
                ThreePointArc((-52.872751681, -37.532021826), (-52.918626749, -37.625524062), (-52.962051912, -37.720188973))
            make_face()
        extrude(amount=BOSS_EXTRUDE3_DEPTH)

    # Sketch6<3> → Cut-Extrude3 (cut)
    with SkipClean():  # the faces are left unmerged after this step: merging them gives an invalid solid
        with BuildSketch(Plane(origin=(0, 4, 0), x_dir=(1, 0, 0), z_dir=(0, 1, 0)).offset(CUT_EXTRUDE3_START)):
            with BuildLine():
                Line((-40.071167272, -7.979459856), (-20.898643838, -5.455349261))
                ThreePointArc((-20.898643838, -5.455349261), (-22.095637401, -1.578420611), (-21.942853375, 2.47620963))
                Line((-21.942853375, 2.47620963), (-41.11537681, -0.047900965))
                ThreePointArc((-41.11537681, -0.047900965), (-44.592679619, -4.082521016), (-40.978584416, -7.995078956))
                ThreePointArc((-40.978584416, -7.995078956), (-40.524431436, -8.013087988), (-40.071167272, -7.979459856))
            make_face()
            with Locations((-40.593272041, -4.013680411)):
                Circle(SKETCH6_3_R, mode=Mode.SUBTRACT)
        extrude(amount=CUT_EXTRUDE3_DEPTH, mode=Mode.SUBTRACT)


solid = part.part
